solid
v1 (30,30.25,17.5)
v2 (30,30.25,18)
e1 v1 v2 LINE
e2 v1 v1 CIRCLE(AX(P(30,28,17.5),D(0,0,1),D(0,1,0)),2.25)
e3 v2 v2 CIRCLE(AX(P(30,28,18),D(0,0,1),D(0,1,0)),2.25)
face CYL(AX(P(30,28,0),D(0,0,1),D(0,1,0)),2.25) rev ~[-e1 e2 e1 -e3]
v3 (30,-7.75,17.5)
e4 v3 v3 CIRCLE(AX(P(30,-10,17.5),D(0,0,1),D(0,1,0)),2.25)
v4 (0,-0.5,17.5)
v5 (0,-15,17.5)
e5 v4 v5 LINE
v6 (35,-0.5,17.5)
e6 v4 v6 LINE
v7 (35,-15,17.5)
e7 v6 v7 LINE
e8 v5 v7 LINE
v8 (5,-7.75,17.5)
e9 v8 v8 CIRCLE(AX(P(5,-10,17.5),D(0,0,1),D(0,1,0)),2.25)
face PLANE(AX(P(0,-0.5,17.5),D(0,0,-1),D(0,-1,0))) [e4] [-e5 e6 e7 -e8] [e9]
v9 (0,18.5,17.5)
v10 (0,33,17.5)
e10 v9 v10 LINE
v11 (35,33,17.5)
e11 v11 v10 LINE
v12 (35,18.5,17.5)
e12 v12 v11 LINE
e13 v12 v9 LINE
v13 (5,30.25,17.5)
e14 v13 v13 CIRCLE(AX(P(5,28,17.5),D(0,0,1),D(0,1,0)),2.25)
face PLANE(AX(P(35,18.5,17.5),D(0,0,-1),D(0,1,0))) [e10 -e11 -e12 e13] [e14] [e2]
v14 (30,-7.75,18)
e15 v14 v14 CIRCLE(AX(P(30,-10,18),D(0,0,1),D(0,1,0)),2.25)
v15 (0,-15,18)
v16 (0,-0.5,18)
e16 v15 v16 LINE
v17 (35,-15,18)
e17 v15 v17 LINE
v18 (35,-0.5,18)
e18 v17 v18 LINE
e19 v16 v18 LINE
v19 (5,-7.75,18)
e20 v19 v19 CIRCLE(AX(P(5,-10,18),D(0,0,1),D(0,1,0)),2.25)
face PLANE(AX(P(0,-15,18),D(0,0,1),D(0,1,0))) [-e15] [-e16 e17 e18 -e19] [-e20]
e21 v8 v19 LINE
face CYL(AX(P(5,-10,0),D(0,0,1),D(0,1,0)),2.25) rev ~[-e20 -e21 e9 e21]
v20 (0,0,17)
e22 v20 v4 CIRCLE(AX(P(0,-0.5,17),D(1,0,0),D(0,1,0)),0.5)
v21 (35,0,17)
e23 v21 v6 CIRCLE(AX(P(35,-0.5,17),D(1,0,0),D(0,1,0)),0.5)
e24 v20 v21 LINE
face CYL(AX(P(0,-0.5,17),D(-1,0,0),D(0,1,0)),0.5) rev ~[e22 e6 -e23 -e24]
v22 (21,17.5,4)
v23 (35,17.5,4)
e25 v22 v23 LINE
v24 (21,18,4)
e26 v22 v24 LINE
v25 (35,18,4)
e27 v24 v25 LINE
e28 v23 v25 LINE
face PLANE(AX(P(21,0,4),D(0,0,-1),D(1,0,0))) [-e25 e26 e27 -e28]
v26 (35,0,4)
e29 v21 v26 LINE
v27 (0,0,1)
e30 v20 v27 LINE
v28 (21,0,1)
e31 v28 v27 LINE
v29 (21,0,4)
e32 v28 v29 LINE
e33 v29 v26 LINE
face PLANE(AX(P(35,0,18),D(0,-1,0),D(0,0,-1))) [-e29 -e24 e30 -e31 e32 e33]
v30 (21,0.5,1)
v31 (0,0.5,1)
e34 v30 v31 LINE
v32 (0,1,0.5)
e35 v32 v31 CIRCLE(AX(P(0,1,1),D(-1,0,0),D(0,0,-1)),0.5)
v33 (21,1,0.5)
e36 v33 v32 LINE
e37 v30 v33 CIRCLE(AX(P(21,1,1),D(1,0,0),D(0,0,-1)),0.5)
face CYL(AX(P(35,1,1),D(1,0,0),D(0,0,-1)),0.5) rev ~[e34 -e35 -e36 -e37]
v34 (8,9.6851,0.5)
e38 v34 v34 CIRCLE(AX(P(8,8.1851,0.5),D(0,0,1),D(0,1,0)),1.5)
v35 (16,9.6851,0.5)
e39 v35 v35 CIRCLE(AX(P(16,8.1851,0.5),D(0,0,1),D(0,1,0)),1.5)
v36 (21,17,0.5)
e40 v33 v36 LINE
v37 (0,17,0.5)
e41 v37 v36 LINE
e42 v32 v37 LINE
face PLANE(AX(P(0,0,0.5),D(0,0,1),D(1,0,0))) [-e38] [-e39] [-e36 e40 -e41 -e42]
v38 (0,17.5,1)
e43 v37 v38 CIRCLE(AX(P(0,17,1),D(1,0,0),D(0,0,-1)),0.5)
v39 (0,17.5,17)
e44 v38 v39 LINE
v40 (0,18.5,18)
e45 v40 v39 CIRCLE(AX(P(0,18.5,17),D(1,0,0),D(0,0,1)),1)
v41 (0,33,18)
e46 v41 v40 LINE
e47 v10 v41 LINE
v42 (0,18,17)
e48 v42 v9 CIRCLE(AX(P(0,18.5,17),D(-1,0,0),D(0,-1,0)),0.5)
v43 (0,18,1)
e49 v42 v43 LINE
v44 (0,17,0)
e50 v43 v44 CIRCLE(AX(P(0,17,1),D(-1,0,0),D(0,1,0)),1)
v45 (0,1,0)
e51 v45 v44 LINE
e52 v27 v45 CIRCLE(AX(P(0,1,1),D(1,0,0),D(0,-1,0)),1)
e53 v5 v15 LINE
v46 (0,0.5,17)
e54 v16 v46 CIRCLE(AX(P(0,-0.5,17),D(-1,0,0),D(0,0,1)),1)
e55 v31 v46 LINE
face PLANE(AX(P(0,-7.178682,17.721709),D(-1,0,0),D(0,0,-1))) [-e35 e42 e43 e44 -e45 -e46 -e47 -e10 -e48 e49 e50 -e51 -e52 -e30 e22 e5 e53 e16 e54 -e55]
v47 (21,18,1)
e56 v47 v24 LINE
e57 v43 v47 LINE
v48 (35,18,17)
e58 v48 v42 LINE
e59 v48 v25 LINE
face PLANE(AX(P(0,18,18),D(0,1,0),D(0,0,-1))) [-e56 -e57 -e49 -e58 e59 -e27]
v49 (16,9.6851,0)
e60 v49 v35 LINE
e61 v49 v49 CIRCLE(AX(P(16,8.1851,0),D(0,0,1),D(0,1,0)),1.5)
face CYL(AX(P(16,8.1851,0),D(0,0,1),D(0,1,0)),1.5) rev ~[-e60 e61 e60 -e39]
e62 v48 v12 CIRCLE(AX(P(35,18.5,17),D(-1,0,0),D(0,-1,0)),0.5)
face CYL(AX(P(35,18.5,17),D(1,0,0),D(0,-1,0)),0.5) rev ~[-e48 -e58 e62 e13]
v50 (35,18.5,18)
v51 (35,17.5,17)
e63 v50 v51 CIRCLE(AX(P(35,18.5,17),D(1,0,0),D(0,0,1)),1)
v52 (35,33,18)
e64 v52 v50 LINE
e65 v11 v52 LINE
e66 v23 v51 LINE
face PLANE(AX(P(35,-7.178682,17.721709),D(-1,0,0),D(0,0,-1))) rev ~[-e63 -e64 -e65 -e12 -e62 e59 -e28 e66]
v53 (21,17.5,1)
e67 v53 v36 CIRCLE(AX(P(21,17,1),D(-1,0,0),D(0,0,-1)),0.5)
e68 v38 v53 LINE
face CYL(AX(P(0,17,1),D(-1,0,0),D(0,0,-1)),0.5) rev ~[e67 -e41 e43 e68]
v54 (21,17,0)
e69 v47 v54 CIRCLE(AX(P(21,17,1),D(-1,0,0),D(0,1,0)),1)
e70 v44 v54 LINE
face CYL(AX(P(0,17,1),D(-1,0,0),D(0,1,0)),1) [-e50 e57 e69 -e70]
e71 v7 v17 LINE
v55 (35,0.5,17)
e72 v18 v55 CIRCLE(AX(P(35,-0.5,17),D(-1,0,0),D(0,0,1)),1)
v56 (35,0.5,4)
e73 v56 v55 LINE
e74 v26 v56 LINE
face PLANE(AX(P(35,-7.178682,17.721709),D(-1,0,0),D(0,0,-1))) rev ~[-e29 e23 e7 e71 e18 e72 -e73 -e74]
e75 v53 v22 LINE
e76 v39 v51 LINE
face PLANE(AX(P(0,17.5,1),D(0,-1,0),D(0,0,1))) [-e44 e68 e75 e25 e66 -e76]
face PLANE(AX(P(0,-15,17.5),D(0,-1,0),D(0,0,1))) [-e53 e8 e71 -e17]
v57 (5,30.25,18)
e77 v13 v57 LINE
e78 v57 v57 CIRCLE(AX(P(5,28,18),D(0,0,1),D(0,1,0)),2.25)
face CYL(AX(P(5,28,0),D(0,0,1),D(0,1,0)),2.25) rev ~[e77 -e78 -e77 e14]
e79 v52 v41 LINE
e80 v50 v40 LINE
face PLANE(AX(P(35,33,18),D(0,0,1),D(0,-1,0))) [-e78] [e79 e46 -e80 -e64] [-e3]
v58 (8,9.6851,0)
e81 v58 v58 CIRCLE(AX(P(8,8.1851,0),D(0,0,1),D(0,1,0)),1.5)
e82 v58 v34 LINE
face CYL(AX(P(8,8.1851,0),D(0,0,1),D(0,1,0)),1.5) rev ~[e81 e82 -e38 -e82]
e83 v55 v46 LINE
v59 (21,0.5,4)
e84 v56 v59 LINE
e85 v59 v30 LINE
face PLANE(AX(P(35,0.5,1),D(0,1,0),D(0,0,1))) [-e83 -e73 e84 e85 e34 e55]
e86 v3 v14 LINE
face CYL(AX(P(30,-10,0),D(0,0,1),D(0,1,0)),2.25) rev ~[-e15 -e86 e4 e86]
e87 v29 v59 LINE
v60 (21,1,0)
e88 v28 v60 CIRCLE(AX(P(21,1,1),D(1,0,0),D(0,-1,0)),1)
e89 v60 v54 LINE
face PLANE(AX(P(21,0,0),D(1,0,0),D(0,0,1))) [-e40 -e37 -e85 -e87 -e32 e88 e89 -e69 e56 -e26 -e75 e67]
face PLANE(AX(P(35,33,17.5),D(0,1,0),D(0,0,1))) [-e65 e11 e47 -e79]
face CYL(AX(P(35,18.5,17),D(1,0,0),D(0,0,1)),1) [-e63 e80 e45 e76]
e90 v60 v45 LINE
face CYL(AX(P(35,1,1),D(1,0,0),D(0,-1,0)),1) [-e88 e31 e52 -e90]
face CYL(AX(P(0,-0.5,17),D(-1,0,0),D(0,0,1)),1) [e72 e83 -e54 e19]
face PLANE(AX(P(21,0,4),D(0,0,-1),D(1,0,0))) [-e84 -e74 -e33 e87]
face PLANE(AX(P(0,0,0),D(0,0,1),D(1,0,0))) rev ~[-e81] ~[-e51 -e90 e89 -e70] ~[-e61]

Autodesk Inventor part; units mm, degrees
ref_plane "YZ Plane" through (0, 0, 0) normal (1, 0, 0) x (0, 1, 0)
ref_plane "XZ Plane" through (0, 0, 0) normal (0, 1, 0) x (-1, 0, 0)
ref_plane "XY Plane" through (0, 0, 0) normal (0, 0, 1) x (1, 0, 0)
sketch "Skizze2" plane through (0, 0, 0) normal (0, 0, 1) x (1, 0, 0)
  line L0 (0, 18) -> (35, 18)
  line L1 (35, 18) -> (35, 0)
  line L2 (35, 0) -> (0, 0)
  line L3 (0, 0) -> (0, 18)
  dimension "d12" = 18
  dimension "d13" = 35
extrude "Grobblech2" add sketch "Skizze2" along normal blind 0.5
sketch "Skizze3" plane through (0, 17.5, 0) normal (0, 1, 0) x (-1, 0, 0)
  line L0 (-35, 0) -> (0, 0)
  line L1 (0, 0) -> (0, 18)
  line L2 (0, 18) -> (-35, 18)
  line L3 (-35, 18) -> (-35, 0)
edge flange "Lasche1" height 18 angle 90 thickness 0.5 bend radius 0.5 thickness toward (0, 1, 0) relief tear relief width 0.5 relief depth 0.25 edges at (17.5, 18, 0.5) wall of the first edge with corners at (35, 17.5, 0) (0, 17.5, 0) (0, 17.5, 18) (35, 17.5, 18)
bend "Biegung1"
corner "Ecke1"
sketch "Skizze4" plane through (35, 0.5, 0) normal (0, -1, 0) x (1, 0, 0)
  line L0 (-35, 0) -> (0, 0)
  line L1 (0, 0) -> (0, 18)
  line L2 (0, 18) -> (-35, 18)
  line L3 (-35, 18) -> (-35, 0)
edge flange "Lasche2" height 18 angle 90 thickness 0.5 bend radius 0.5 thickness toward (0, -1, 0) relief tear relief width 0.5 relief depth 0.25 edges at (17.5, 0, 0.5) wall of the first edge with corners at (0, 0.5, 0) (35, 0.5, 0) (35, 0.5, 18) (0, 0.5, 18)
bend "Biegung2"
corner "Ecke2"
sketch "Skizze5" plane through (35, 17.5, 17.5) normal (0, 0, 1) x (1, 0, 0)
  line L0 (-35, 0) -> (0, 0)
  line L1 (0, 0) -> (0, 15.5)
  line L2 (0, 15.5) -> (-35, 15.5)
  line L3 (-35, 15.5) -> (-35, 0)
edge flange "Lasche3" height 15.5 angle 90 thickness 0.5 bend radius 0.5 thickness toward (0, 0, 1) relief tear relief width 0.5 relief depth 0.25 edges at (17.5, 18, 18) wall of the first edge with corners at (0, 17.5, 17.5) (35, 17.5, 17.5) (35, 33, 17.5) (0, 33, 17.5)
bend "Biegung3"
corner "Ecke3"
sketch "Skizze6" plane through (0, 0.5, 17.5) normal (0, 0, 1) x (1, 0, 0)
  line L0 (35, 0) -> (0, 0)
  line L1 (0, 0) -> (0, -15.5)
  line L2 (0, -15.5) -> (35, -15.5)
  line L3 (35, -15.5) -> (35, 0)
edge flange "Lasche4" height 15.5 angle 90 thickness 0.5 bend radius 0.5 thickness toward (0, 0, 1) relief tear relief width 0.5 relief depth 0.25 edges at (17.5, 0, 18) wall of the first edge with corners at (35, 0.5, 17.5) (0, 0.5, 17.5) (0, -15, 17.5) (35, -15, 17.5)
bend "Biegung4"
corner "Ecke4"
sketch "Skizze7" plane through (0, 0, 1) normal (0, -1, 0) x (1, 0, 0)
  line L0 (35, -1) -> (21, -1)
  line L1 (21, -1) -> (21, 3)
  line L2 (21, 3) -> (35, 3)
  line L3 (35, 3) -> (35, -1)
  line L4 (35, -1) -> (0, -1) projected
  dimension "d55" = 4
  dimension "d56" = 14
extrude "Ausschneiden1" cut sketch "Skizze7" against normal up to surface (18 mm away)
sketch "Skizze8" plane through (0, 0, 0) normal (0, 0, -1) x (-1, 0, 0)
  line L0 (-21, 17) -> (-21, 1) projected
  line L1 (-21, 1) -> (0, 1) projected
  line L2 (0, 17) -> (0, 1) projected
  line L3 (0, 17) -> (-21, 17) projected
  line L4 (0, 9) -> (-30.5159, 9) construction
  line L5 (-35, -15) -> (0, -15) projected
  line L6 (-17.5, -15) -> (-17.5, 33) construction
  line L7 (0, 33) -> (-35, 33) projected
  point P0 (0, 0)
  point P1 (-30, 28)
  point P2 (-5, 28)
  point P3 (-30, -10)
  point P4 (-5, -10)
  dimension "d59" = 25
  dimension "d60" = 38
  dimension "d61" = 25
  dimension "d62" = 38
hole "Bohrung1" at (30, 28, 0) at (5, 28, 0) at (30, -10, 0) at (5, -10, 0) direction (0, 0, 1) diameter 4.5 depth 18
sketch "Skizze9" plane through (0, 0, 0) normal (0, 0, -1) x (-1, 0, 0)
  line L0 (0, 17) -> (0, 1) projected
  point P0 (0, 0)
  point P1 (-8, 8.1851)
  point P2 (-16, 8.1851)
  dimension "d70" = 8
  dimension "d71" = 8
hole "Bohrung2" at (8, 8.1851, 0) at (16, 8.1851, 0) direction (0, 0, 1) diameter 3 end through all
equation "\"d57\" = Stärke"
equation "\"d68\" = Stärke"
equation "\"d14\" = Stärke"
equation "\"d15\" = BreiteBiegungsfreistellung"
equation "\"d16\" = TiefeBiegungsfreistellung"
equation "\"d17\" = MinimalRest"
equation "\"d18\" = Übergangsradius"
equation "\"d21\" = Biegeradius"
equation "\"d22\" = GrößeEckenfreistellung"
equation "\"d23\" = Abstandsgröße"
equation "\"d24\" = JacobiRadiusGröße"
equation "\"d25\" = BreiteBiegungsfreistellung"
equation "\"d26\" = TiefeBiegungsfreistellung"
equation "\"d27\" = MinimalRest"
equation "\"d28\" = Übergangsradius"
equation "\"d31\" = Biegeradius"
equation "\"d32\" = GrößeEckenfreistellung"
equation "\"d33\" = Abstandsgröße"
equation "\"d34\" = JacobiRadiusGröße"
equation "\"d35\" = BreiteBiegungsfreistellung"
equation "\"d36\" = TiefeBiegungsfreistellung"
equation "\"d37\" = MinimalRest"
equation "\"d38\" = Übergangsradius"
equation "\"d41\" = Biegeradius"
equation "\"d42\" = GrößeEckenfreistellung"
equation "\"d43\" = Abstandsgröße"
equation "\"d44\" = JacobiRadiusGröße"
equation "\"d45\" = BreiteBiegungsfreistellung"
equation "\"d46\" = TiefeBiegungsfreistellung"
equation "\"d47\" = MinimalRest"
equation "\"d48\" = Übergangsradius"
equation "\"d51\" = Biegeradius"
equation "\"d52\" = GrößeEckenfreistellung"
equation "\"d53\" = Abstandsgröße"
equation "\"d54\" = JacobiRadiusGröße"
equation "\"Biegeradius\" = Stärke"
equation "\"BreiteBiegungsfreistellung\" = Stärke"
equation "\"TiefeBiegungsfreistellung\" = 0.5 * Stärke"
equation "\"GrößeEckenfreistellung\" = 4 * Stärke"
equation "\"MinimalRest\" = 2 * Stärke"
equation "\"Übergangsradius\" = Biegeradius"
equation "\"JacobiRadiusGröße\" = Biegeradius"
equation "\"Abstandsgröße\" = Stärke"
equation "\"Stärke\" = 0.5"
properties part number "Bügelbefestigung" material "Stahl, galvanisiert"
